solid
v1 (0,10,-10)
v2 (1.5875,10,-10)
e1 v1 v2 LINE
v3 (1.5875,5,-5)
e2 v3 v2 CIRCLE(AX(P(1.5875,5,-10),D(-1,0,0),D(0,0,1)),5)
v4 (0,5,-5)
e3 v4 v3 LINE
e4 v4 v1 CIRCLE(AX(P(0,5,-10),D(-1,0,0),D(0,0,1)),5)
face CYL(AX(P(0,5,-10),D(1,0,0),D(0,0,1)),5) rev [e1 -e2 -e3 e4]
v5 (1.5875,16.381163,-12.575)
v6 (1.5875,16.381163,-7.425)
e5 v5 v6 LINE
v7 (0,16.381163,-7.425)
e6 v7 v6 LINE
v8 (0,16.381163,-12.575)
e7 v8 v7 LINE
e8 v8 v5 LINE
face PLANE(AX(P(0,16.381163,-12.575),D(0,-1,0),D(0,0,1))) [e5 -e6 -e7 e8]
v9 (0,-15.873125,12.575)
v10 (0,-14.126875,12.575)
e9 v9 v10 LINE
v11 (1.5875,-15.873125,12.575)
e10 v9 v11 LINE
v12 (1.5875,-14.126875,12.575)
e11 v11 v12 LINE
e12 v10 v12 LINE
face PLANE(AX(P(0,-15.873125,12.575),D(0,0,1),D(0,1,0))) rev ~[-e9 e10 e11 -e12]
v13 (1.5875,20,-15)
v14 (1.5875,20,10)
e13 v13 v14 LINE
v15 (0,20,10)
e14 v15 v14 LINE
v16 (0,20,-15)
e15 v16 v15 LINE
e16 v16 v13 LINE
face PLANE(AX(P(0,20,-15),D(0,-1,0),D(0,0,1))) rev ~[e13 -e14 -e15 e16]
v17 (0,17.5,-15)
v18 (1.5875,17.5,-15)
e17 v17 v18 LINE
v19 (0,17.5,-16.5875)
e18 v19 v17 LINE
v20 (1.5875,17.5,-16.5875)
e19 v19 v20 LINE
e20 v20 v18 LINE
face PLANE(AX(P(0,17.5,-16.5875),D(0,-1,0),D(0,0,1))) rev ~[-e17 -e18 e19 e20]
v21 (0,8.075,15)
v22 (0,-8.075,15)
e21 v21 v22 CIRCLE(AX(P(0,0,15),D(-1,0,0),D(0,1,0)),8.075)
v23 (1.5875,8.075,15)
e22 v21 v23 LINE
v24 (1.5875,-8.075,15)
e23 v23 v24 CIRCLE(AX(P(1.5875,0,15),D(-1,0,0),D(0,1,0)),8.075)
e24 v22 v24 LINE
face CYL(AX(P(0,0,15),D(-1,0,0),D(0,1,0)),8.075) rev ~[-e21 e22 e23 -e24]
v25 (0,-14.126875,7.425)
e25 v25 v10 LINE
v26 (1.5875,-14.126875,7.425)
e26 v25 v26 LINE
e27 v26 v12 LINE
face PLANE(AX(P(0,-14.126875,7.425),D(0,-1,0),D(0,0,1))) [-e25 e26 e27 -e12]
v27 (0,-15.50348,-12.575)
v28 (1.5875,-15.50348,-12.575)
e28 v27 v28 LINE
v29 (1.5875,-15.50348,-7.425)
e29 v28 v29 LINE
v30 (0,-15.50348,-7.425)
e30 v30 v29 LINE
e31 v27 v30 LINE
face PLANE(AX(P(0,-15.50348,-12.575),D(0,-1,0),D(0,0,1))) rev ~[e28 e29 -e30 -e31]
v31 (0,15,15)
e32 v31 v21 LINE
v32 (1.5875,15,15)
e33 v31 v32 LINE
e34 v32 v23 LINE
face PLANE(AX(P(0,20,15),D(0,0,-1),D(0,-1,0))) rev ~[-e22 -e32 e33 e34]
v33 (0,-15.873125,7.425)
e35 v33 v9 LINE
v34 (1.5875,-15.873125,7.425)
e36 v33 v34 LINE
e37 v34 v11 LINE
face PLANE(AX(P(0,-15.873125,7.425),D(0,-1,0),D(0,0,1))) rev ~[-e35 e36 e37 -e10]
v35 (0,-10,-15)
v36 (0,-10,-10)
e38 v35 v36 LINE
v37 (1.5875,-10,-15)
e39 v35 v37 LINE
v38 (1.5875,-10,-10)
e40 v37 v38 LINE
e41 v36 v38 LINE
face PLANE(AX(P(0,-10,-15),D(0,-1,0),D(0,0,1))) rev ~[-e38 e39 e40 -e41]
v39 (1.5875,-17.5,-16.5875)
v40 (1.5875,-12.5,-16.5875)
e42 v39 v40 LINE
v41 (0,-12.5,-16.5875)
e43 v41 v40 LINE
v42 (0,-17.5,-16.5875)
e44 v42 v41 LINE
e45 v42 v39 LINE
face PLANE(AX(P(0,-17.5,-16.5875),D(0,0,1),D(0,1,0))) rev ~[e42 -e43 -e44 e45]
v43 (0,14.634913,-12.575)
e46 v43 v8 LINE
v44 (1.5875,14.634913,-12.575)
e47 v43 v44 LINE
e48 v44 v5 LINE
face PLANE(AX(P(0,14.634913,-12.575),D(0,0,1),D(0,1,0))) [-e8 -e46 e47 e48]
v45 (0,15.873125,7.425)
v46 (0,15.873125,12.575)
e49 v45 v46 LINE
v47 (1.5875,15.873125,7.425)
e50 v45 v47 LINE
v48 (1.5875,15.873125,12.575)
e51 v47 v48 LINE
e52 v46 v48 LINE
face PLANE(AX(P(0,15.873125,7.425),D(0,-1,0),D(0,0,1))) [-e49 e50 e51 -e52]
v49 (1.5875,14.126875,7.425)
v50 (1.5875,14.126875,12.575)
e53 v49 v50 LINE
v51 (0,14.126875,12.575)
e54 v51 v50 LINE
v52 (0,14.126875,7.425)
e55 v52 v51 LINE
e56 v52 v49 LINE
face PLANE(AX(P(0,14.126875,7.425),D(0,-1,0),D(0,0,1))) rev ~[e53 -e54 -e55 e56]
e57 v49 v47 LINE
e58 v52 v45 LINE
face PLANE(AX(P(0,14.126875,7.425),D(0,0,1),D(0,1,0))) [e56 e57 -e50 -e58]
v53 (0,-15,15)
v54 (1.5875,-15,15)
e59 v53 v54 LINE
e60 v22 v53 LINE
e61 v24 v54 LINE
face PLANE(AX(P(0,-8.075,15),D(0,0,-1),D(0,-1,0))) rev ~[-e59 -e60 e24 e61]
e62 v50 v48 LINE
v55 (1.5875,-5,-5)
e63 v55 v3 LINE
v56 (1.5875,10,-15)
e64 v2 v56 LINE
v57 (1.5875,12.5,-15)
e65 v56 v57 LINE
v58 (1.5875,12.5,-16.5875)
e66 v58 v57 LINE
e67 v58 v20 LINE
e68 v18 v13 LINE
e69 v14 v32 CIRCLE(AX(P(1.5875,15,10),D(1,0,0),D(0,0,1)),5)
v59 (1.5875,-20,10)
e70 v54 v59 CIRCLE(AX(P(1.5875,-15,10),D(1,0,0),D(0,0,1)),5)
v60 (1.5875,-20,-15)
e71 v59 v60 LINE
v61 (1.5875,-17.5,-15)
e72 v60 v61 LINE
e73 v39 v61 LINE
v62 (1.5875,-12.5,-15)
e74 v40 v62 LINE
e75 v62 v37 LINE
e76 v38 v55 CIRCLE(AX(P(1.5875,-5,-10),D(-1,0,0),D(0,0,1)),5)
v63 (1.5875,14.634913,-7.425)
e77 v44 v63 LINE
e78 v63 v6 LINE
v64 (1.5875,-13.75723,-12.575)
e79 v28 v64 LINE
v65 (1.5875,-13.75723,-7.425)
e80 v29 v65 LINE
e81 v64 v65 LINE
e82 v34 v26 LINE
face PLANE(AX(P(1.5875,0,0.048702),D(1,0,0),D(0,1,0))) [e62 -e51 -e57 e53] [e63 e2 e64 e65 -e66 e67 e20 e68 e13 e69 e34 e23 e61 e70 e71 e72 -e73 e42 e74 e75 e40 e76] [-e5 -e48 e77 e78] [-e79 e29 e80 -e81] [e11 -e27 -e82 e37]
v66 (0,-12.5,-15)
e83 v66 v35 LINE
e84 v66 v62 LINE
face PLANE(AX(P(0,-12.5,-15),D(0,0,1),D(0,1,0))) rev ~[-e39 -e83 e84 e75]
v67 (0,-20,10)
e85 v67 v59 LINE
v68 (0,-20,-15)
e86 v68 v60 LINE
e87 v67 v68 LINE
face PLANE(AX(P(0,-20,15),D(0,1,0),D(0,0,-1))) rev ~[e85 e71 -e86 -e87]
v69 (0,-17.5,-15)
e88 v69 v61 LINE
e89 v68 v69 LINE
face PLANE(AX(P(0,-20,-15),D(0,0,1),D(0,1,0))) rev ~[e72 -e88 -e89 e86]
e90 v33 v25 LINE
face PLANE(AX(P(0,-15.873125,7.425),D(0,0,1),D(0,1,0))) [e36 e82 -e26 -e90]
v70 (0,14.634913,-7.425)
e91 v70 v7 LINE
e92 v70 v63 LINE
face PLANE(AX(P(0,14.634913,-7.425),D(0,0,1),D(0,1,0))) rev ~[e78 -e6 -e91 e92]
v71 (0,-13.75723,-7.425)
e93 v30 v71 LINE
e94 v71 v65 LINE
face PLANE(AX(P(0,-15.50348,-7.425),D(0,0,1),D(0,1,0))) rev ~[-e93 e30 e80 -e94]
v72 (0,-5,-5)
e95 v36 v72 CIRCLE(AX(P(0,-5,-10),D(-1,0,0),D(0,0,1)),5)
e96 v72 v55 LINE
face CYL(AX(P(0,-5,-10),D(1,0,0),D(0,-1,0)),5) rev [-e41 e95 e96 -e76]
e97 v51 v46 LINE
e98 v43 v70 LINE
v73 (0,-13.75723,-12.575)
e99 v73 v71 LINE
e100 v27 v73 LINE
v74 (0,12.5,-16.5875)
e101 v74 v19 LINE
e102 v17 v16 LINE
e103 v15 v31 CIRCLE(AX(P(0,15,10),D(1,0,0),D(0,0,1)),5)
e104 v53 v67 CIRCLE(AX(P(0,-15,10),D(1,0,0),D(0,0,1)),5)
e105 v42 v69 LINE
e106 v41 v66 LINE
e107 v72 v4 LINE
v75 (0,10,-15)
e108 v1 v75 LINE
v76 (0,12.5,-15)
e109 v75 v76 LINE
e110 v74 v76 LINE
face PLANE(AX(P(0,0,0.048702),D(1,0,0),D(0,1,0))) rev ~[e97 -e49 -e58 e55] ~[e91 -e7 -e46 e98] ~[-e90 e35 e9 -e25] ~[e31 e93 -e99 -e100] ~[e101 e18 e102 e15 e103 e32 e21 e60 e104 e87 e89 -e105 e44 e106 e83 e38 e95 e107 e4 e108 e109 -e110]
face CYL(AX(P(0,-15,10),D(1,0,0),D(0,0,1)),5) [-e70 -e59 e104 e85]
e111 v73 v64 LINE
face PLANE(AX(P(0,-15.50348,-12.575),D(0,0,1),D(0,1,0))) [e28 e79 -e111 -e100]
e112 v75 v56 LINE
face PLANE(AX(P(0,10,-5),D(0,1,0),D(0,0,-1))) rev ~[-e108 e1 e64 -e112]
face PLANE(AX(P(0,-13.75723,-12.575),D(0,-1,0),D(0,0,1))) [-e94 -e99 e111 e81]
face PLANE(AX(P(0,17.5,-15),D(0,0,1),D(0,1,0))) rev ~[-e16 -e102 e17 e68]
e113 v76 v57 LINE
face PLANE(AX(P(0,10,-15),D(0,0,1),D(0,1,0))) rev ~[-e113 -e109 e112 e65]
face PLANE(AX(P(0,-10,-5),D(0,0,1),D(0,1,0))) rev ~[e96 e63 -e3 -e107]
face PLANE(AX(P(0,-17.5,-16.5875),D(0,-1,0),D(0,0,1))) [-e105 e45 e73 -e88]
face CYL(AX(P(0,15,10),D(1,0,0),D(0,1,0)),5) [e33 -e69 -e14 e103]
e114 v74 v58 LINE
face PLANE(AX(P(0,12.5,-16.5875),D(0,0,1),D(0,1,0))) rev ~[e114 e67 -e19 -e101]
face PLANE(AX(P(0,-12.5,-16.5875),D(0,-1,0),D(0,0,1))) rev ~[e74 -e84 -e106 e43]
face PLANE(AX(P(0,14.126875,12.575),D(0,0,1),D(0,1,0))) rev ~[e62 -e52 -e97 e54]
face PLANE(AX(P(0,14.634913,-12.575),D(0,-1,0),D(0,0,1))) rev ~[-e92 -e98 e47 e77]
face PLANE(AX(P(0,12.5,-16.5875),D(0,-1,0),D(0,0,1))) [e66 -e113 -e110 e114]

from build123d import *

# Parameters (mm, degrees)
F0_W     = 1.74625
F0_H     = 5.15
F0_W_2   = 5
F0_H_2   = 1.5875
F1_DEPTH = 1.5875
F2_R     = 5


# Not quite as in the source:
# - a length typed as a fraction of an inch, garbled in the dataset ("3 / 203.2 mm" for 3/8 in), is restored


with BuildPart() as f1:
    # F0 (on Right) → F1 (new body)
    with BuildSketch(Plane.YZ):
        with BuildLine():
            Line((20, -15), (20, 15))
            Line((20, 15), (8.075, 15))
            ThreePointArc((8.075, 15), (0, 6.925), (-8.075, 15))
            Line((-8.075, 15), (-20, 15))
            Line((-20, 15), (-20, -15))
            Line((-20, -15), (-17.5, -15))
            Line((-17.5, -15), (-12.5, -15))
            Line((-12.5, -15), (-10, -15))
            Line((-10, -15), (-10, -5))
            Line((-10, -5), (10, -5))
            Line((10, -5), (10, -15))
            Line((10, -15), (12.5, -15))
            Line((12.5, -15), (17.5, -15))
            Line((17.5, -15), (20, -15))
        make_face()
        with Locations((-14.6303550991, -10)):
            Rectangle(F0_W, F0_H, mode=Mode.SUBTRACT)
        with Locations((15.5080378336, -10)):
            Rectangle(F0_W, F0_H, mode=Mode.SUBTRACT)
        with Locations((-15, 10)):
            Rectangle(F0_W, F0_H, mode=Mode.SUBTRACT)
        with Locations((15, 10)):
            Rectangle(F0_W, F0_H, mode=Mode.SUBTRACT)
        with Locations((-15, -15.79375)):
            Rectangle(F0_W_2, F0_H_2)
        with Locations((15, -15.79375)):
            Rectangle(F0_W_2, F0_H_2)
    extrude(amount=F1_DEPTH)

    # F2
    f2_edges = [f1.edges().sort_by_distance(p)[0] for p in [
        (0.79375, -10, -5),
        (0.79375, 10, -5),
        (0.79375, 20, 15),
        (0.79375, -20, 15),
    ]]
    fillet(f2_edges, radius=F2_R)


solid = f1.part
